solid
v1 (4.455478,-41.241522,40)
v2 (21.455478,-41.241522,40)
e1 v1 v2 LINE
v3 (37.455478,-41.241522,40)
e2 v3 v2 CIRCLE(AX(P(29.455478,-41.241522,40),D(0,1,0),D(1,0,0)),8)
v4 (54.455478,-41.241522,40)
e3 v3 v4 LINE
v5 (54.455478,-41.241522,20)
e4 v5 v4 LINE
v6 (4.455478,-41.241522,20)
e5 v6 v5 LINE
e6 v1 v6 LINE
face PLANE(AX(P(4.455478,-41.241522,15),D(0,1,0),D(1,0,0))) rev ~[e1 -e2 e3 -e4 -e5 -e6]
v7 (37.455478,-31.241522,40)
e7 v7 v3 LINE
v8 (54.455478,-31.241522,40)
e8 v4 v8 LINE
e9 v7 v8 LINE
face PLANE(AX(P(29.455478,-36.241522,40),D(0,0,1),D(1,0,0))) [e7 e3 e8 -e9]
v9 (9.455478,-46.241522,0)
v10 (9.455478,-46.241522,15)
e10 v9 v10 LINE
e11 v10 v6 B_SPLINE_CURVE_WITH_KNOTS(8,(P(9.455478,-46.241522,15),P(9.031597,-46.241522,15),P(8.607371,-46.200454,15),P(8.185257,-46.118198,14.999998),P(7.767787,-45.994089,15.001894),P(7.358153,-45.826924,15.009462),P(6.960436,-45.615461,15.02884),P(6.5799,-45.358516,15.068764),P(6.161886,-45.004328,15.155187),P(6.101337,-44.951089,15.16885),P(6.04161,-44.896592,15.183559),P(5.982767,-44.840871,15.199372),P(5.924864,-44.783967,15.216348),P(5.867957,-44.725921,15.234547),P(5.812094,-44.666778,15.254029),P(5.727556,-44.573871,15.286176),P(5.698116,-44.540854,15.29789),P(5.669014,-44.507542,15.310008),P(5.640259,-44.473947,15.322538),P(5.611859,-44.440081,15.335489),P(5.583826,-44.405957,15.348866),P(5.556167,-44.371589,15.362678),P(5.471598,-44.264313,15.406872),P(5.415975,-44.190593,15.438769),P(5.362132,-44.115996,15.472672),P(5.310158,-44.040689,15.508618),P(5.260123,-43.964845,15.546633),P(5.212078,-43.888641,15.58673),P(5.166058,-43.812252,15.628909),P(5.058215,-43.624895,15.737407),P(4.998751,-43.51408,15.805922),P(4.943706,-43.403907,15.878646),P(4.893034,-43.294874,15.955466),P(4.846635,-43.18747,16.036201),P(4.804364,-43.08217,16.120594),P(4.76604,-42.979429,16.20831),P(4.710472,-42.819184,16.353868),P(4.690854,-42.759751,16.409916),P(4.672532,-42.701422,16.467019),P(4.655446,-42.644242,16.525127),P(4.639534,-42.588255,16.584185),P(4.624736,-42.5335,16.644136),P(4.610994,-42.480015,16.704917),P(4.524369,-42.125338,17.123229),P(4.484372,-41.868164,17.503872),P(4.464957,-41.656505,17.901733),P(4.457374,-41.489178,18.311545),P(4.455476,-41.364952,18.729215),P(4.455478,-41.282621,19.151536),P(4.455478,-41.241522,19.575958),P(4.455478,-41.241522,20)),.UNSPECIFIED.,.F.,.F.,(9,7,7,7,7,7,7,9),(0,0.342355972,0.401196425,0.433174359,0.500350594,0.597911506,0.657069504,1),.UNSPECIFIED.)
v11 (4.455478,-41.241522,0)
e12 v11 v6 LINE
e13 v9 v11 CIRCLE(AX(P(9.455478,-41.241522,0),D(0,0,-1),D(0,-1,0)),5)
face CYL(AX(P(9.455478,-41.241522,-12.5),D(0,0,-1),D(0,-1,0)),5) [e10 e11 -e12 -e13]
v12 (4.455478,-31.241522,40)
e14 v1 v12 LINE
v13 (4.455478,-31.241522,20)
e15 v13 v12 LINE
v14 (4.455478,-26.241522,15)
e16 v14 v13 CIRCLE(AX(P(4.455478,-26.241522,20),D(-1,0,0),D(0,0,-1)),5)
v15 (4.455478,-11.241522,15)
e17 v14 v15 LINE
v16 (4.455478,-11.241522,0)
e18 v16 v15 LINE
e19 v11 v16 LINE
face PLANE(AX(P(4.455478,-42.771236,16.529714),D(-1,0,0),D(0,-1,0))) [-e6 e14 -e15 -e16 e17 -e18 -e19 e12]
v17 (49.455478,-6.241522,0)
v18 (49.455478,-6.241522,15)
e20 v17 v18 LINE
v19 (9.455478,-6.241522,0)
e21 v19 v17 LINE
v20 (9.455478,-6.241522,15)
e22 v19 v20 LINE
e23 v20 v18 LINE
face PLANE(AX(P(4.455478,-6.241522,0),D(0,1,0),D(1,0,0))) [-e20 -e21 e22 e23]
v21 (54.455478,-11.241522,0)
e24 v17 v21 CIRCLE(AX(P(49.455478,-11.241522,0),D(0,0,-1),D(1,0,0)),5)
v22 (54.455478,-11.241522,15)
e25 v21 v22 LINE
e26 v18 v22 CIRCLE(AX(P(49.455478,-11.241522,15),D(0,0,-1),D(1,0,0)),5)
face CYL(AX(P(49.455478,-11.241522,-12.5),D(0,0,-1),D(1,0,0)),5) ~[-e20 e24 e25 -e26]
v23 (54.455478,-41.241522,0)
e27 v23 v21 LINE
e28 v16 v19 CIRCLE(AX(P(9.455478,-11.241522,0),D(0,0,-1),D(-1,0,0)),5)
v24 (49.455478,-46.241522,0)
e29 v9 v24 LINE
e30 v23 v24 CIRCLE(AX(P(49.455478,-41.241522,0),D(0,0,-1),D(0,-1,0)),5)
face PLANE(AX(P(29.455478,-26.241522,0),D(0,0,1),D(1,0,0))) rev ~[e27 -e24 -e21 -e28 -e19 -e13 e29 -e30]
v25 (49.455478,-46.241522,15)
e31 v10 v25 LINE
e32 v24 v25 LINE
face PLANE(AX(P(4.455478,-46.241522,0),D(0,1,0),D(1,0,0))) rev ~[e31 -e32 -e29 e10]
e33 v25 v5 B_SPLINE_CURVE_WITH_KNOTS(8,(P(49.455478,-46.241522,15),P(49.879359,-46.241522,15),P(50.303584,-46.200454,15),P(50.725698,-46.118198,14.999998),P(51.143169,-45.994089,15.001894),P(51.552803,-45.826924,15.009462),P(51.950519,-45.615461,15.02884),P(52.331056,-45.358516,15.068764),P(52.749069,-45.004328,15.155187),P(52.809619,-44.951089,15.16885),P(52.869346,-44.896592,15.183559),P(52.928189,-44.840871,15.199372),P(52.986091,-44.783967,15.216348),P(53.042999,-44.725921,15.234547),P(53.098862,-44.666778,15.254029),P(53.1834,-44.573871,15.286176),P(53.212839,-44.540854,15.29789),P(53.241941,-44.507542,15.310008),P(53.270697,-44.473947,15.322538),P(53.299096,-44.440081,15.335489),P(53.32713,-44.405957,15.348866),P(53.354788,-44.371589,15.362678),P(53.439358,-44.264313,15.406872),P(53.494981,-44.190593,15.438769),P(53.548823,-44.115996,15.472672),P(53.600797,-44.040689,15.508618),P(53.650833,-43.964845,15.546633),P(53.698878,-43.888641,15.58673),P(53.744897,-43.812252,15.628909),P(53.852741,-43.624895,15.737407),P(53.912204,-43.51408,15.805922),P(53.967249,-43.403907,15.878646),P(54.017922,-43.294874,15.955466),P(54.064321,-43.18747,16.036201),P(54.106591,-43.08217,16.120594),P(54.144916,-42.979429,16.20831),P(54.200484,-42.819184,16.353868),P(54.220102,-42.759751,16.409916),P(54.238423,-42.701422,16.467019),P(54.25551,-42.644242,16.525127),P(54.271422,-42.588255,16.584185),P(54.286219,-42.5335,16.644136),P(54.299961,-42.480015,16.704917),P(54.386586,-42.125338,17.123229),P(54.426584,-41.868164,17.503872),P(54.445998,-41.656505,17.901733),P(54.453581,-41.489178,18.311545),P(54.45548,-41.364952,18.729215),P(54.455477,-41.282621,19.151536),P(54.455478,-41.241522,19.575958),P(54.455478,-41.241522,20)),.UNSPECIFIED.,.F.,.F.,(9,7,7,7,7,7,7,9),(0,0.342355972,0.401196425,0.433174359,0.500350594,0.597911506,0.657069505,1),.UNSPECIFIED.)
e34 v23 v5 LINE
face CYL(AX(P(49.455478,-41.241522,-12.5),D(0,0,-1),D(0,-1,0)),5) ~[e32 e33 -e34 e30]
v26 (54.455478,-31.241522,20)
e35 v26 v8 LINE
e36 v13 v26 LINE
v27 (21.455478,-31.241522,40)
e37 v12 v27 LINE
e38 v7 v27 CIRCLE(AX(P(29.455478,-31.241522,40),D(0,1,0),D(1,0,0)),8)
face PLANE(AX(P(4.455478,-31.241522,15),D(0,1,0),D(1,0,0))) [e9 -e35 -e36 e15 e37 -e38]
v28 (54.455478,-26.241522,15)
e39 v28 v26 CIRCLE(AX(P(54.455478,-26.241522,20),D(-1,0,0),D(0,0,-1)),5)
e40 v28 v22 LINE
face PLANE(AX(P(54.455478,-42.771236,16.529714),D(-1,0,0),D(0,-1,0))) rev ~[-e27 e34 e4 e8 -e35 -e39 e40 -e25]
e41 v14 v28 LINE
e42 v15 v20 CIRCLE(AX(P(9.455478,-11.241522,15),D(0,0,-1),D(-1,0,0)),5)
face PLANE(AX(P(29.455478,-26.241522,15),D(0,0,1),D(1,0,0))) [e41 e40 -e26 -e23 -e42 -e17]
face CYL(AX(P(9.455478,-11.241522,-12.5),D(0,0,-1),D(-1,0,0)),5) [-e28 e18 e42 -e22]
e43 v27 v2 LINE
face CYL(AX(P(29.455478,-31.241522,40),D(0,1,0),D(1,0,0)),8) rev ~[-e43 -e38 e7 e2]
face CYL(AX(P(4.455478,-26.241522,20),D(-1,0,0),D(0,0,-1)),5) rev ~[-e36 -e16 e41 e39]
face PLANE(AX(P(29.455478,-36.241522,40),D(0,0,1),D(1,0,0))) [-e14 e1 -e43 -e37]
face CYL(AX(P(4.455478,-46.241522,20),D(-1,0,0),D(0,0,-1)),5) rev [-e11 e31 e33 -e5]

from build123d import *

# Parameters (mm, degrees)
F0_W        = 50
F0_H        = 40
F1_DEPTH    = 15
F2_W        = 50
F2_H        = 10
F3_DEPTH    = 25
F5_DEPTH    = 25
F7_T1_DEPTH = 50
F7_T3_DEPTH = 40


# Not quite as in the source:
# - a fillet or chamfer that OpenCascade refuses, or shapes differently, is made with other operations: its cross-section is extruded or revolved along the edge and cut away or added
# - a feature of the source that left no trace in its solid (it failed there, or was rolled back) is left out


with BuildPart() as f1:
    # F0 (on Top) → F1 (new body)
    with BuildSketch(Plane.XY):
        with Locations((29.4554777443, -26.2415218353)):
            Rectangle(F0_W, F0_H)
    extrude(amount=F1_DEPTH)

    # F2 (on face) → F3 (join)
    with BuildSketch(Plane.XY.offset(15)):
        with Locations((29.4554777443, -36.2415218353)):
            Rectangle(F2_W, F2_H)
    extrude(amount=F3_DEPTH)

    # F4 (on face) → F5 (cut)
    with BuildSketch(Plane(origin=(0, -31.2415218353, 0), x_dir=(-1, 0, 0), z_dir=(0, 1, 0))):
        with BuildLine():
            ThreePointArc((-37.4554777443, 40), (-29.4554777443, 32), (-21.4554777443, 40))
            Line((-21.4554777443, 40), (-37.4554777443, 40))
        make_face()
    extrude(amount=-F5_DEPTH, mode=Mode.SUBTRACT)

    # F7: fillet of radius 5 on 6 edges, made by hand

    # F7_s2 → F7_t1 (join)
    with BuildSketch(Plane.YZ.offset(4.4554777443)):
        with BuildLine():
            ThreePointArc((-46.2415218353, 15), (-42.7059879294, 16.4644660941), (-41.2415218353, 20))
            Line((-41.2415218353, 20), (-41.2415218353, 15))
            Line((-41.2415218353, 15), (-46.2415218353, 15))
        make_face()
        with BuildLine():
            ThreePointArc((-26.2415218353, 15), (-29.7770557413, 16.4644660941), (-31.2415218353, 20))
            Line((-31.2415218353, 20), (-31.2415218353, 15))
            Line((-31.2415218353, 15), (-26.2415218353, 15))
        make_face()
    extrude(amount=F7_T1_DEPTH)

    # F7_s4 → F7_t3 (cut)
    with BuildSketch(Plane.XY.offset(-12.5)):
        with BuildLine():
            ThreePointArc((9.4554777443, -46.2415218353), (5.9199438384, -44.7770557413), (4.4554777443, -41.2415218353))
            Line((4.4554777443, -41.2415218353), (4.4554777443, -46.2415218353))
            Line((4.4554777443, -46.2415218353), (9.4554777443, -46.2415218353))
        make_face()
        with BuildLine():
            ThreePointArc((49.4554777443, -46.2415218353), (52.9910116503, -44.7770557413), (54.4554777443, -41.2415218353))
            Line((54.4554777443, -41.2415218353), (54.4554777443, -46.2415218353))
            Line((54.4554777443, -46.2415218353), (49.4554777443, -46.2415218353))
        make_face()
        with BuildLine():
            ThreePointArc((4.4554777443, -11.2415218353), (5.9199438384, -7.7059879294), (9.4554777443, -6.2415218353))
            Line((9.4554777443, -6.2415218353), (4.4554777443, -6.2415218353))
            Line((4.4554777443, -6.2415218353), (4.4554777443, -11.2415218353))
        make_face()
        with BuildLine():
            ThreePointArc((54.4554777443, -11.2415218353), (52.9910116503, -7.7059879294), (49.4554777443, -6.2415218353))
            Line((49.4554777443, -6.2415218353), (54.4554777443, -6.2415218353))
            Line((54.4554777443, -6.2415218353), (54.4554777443, -11.2415218353))
        make_face()
    extrude(amount=F7_T3_DEPTH, mode=Mode.SUBTRACT)


solid = f1.part
